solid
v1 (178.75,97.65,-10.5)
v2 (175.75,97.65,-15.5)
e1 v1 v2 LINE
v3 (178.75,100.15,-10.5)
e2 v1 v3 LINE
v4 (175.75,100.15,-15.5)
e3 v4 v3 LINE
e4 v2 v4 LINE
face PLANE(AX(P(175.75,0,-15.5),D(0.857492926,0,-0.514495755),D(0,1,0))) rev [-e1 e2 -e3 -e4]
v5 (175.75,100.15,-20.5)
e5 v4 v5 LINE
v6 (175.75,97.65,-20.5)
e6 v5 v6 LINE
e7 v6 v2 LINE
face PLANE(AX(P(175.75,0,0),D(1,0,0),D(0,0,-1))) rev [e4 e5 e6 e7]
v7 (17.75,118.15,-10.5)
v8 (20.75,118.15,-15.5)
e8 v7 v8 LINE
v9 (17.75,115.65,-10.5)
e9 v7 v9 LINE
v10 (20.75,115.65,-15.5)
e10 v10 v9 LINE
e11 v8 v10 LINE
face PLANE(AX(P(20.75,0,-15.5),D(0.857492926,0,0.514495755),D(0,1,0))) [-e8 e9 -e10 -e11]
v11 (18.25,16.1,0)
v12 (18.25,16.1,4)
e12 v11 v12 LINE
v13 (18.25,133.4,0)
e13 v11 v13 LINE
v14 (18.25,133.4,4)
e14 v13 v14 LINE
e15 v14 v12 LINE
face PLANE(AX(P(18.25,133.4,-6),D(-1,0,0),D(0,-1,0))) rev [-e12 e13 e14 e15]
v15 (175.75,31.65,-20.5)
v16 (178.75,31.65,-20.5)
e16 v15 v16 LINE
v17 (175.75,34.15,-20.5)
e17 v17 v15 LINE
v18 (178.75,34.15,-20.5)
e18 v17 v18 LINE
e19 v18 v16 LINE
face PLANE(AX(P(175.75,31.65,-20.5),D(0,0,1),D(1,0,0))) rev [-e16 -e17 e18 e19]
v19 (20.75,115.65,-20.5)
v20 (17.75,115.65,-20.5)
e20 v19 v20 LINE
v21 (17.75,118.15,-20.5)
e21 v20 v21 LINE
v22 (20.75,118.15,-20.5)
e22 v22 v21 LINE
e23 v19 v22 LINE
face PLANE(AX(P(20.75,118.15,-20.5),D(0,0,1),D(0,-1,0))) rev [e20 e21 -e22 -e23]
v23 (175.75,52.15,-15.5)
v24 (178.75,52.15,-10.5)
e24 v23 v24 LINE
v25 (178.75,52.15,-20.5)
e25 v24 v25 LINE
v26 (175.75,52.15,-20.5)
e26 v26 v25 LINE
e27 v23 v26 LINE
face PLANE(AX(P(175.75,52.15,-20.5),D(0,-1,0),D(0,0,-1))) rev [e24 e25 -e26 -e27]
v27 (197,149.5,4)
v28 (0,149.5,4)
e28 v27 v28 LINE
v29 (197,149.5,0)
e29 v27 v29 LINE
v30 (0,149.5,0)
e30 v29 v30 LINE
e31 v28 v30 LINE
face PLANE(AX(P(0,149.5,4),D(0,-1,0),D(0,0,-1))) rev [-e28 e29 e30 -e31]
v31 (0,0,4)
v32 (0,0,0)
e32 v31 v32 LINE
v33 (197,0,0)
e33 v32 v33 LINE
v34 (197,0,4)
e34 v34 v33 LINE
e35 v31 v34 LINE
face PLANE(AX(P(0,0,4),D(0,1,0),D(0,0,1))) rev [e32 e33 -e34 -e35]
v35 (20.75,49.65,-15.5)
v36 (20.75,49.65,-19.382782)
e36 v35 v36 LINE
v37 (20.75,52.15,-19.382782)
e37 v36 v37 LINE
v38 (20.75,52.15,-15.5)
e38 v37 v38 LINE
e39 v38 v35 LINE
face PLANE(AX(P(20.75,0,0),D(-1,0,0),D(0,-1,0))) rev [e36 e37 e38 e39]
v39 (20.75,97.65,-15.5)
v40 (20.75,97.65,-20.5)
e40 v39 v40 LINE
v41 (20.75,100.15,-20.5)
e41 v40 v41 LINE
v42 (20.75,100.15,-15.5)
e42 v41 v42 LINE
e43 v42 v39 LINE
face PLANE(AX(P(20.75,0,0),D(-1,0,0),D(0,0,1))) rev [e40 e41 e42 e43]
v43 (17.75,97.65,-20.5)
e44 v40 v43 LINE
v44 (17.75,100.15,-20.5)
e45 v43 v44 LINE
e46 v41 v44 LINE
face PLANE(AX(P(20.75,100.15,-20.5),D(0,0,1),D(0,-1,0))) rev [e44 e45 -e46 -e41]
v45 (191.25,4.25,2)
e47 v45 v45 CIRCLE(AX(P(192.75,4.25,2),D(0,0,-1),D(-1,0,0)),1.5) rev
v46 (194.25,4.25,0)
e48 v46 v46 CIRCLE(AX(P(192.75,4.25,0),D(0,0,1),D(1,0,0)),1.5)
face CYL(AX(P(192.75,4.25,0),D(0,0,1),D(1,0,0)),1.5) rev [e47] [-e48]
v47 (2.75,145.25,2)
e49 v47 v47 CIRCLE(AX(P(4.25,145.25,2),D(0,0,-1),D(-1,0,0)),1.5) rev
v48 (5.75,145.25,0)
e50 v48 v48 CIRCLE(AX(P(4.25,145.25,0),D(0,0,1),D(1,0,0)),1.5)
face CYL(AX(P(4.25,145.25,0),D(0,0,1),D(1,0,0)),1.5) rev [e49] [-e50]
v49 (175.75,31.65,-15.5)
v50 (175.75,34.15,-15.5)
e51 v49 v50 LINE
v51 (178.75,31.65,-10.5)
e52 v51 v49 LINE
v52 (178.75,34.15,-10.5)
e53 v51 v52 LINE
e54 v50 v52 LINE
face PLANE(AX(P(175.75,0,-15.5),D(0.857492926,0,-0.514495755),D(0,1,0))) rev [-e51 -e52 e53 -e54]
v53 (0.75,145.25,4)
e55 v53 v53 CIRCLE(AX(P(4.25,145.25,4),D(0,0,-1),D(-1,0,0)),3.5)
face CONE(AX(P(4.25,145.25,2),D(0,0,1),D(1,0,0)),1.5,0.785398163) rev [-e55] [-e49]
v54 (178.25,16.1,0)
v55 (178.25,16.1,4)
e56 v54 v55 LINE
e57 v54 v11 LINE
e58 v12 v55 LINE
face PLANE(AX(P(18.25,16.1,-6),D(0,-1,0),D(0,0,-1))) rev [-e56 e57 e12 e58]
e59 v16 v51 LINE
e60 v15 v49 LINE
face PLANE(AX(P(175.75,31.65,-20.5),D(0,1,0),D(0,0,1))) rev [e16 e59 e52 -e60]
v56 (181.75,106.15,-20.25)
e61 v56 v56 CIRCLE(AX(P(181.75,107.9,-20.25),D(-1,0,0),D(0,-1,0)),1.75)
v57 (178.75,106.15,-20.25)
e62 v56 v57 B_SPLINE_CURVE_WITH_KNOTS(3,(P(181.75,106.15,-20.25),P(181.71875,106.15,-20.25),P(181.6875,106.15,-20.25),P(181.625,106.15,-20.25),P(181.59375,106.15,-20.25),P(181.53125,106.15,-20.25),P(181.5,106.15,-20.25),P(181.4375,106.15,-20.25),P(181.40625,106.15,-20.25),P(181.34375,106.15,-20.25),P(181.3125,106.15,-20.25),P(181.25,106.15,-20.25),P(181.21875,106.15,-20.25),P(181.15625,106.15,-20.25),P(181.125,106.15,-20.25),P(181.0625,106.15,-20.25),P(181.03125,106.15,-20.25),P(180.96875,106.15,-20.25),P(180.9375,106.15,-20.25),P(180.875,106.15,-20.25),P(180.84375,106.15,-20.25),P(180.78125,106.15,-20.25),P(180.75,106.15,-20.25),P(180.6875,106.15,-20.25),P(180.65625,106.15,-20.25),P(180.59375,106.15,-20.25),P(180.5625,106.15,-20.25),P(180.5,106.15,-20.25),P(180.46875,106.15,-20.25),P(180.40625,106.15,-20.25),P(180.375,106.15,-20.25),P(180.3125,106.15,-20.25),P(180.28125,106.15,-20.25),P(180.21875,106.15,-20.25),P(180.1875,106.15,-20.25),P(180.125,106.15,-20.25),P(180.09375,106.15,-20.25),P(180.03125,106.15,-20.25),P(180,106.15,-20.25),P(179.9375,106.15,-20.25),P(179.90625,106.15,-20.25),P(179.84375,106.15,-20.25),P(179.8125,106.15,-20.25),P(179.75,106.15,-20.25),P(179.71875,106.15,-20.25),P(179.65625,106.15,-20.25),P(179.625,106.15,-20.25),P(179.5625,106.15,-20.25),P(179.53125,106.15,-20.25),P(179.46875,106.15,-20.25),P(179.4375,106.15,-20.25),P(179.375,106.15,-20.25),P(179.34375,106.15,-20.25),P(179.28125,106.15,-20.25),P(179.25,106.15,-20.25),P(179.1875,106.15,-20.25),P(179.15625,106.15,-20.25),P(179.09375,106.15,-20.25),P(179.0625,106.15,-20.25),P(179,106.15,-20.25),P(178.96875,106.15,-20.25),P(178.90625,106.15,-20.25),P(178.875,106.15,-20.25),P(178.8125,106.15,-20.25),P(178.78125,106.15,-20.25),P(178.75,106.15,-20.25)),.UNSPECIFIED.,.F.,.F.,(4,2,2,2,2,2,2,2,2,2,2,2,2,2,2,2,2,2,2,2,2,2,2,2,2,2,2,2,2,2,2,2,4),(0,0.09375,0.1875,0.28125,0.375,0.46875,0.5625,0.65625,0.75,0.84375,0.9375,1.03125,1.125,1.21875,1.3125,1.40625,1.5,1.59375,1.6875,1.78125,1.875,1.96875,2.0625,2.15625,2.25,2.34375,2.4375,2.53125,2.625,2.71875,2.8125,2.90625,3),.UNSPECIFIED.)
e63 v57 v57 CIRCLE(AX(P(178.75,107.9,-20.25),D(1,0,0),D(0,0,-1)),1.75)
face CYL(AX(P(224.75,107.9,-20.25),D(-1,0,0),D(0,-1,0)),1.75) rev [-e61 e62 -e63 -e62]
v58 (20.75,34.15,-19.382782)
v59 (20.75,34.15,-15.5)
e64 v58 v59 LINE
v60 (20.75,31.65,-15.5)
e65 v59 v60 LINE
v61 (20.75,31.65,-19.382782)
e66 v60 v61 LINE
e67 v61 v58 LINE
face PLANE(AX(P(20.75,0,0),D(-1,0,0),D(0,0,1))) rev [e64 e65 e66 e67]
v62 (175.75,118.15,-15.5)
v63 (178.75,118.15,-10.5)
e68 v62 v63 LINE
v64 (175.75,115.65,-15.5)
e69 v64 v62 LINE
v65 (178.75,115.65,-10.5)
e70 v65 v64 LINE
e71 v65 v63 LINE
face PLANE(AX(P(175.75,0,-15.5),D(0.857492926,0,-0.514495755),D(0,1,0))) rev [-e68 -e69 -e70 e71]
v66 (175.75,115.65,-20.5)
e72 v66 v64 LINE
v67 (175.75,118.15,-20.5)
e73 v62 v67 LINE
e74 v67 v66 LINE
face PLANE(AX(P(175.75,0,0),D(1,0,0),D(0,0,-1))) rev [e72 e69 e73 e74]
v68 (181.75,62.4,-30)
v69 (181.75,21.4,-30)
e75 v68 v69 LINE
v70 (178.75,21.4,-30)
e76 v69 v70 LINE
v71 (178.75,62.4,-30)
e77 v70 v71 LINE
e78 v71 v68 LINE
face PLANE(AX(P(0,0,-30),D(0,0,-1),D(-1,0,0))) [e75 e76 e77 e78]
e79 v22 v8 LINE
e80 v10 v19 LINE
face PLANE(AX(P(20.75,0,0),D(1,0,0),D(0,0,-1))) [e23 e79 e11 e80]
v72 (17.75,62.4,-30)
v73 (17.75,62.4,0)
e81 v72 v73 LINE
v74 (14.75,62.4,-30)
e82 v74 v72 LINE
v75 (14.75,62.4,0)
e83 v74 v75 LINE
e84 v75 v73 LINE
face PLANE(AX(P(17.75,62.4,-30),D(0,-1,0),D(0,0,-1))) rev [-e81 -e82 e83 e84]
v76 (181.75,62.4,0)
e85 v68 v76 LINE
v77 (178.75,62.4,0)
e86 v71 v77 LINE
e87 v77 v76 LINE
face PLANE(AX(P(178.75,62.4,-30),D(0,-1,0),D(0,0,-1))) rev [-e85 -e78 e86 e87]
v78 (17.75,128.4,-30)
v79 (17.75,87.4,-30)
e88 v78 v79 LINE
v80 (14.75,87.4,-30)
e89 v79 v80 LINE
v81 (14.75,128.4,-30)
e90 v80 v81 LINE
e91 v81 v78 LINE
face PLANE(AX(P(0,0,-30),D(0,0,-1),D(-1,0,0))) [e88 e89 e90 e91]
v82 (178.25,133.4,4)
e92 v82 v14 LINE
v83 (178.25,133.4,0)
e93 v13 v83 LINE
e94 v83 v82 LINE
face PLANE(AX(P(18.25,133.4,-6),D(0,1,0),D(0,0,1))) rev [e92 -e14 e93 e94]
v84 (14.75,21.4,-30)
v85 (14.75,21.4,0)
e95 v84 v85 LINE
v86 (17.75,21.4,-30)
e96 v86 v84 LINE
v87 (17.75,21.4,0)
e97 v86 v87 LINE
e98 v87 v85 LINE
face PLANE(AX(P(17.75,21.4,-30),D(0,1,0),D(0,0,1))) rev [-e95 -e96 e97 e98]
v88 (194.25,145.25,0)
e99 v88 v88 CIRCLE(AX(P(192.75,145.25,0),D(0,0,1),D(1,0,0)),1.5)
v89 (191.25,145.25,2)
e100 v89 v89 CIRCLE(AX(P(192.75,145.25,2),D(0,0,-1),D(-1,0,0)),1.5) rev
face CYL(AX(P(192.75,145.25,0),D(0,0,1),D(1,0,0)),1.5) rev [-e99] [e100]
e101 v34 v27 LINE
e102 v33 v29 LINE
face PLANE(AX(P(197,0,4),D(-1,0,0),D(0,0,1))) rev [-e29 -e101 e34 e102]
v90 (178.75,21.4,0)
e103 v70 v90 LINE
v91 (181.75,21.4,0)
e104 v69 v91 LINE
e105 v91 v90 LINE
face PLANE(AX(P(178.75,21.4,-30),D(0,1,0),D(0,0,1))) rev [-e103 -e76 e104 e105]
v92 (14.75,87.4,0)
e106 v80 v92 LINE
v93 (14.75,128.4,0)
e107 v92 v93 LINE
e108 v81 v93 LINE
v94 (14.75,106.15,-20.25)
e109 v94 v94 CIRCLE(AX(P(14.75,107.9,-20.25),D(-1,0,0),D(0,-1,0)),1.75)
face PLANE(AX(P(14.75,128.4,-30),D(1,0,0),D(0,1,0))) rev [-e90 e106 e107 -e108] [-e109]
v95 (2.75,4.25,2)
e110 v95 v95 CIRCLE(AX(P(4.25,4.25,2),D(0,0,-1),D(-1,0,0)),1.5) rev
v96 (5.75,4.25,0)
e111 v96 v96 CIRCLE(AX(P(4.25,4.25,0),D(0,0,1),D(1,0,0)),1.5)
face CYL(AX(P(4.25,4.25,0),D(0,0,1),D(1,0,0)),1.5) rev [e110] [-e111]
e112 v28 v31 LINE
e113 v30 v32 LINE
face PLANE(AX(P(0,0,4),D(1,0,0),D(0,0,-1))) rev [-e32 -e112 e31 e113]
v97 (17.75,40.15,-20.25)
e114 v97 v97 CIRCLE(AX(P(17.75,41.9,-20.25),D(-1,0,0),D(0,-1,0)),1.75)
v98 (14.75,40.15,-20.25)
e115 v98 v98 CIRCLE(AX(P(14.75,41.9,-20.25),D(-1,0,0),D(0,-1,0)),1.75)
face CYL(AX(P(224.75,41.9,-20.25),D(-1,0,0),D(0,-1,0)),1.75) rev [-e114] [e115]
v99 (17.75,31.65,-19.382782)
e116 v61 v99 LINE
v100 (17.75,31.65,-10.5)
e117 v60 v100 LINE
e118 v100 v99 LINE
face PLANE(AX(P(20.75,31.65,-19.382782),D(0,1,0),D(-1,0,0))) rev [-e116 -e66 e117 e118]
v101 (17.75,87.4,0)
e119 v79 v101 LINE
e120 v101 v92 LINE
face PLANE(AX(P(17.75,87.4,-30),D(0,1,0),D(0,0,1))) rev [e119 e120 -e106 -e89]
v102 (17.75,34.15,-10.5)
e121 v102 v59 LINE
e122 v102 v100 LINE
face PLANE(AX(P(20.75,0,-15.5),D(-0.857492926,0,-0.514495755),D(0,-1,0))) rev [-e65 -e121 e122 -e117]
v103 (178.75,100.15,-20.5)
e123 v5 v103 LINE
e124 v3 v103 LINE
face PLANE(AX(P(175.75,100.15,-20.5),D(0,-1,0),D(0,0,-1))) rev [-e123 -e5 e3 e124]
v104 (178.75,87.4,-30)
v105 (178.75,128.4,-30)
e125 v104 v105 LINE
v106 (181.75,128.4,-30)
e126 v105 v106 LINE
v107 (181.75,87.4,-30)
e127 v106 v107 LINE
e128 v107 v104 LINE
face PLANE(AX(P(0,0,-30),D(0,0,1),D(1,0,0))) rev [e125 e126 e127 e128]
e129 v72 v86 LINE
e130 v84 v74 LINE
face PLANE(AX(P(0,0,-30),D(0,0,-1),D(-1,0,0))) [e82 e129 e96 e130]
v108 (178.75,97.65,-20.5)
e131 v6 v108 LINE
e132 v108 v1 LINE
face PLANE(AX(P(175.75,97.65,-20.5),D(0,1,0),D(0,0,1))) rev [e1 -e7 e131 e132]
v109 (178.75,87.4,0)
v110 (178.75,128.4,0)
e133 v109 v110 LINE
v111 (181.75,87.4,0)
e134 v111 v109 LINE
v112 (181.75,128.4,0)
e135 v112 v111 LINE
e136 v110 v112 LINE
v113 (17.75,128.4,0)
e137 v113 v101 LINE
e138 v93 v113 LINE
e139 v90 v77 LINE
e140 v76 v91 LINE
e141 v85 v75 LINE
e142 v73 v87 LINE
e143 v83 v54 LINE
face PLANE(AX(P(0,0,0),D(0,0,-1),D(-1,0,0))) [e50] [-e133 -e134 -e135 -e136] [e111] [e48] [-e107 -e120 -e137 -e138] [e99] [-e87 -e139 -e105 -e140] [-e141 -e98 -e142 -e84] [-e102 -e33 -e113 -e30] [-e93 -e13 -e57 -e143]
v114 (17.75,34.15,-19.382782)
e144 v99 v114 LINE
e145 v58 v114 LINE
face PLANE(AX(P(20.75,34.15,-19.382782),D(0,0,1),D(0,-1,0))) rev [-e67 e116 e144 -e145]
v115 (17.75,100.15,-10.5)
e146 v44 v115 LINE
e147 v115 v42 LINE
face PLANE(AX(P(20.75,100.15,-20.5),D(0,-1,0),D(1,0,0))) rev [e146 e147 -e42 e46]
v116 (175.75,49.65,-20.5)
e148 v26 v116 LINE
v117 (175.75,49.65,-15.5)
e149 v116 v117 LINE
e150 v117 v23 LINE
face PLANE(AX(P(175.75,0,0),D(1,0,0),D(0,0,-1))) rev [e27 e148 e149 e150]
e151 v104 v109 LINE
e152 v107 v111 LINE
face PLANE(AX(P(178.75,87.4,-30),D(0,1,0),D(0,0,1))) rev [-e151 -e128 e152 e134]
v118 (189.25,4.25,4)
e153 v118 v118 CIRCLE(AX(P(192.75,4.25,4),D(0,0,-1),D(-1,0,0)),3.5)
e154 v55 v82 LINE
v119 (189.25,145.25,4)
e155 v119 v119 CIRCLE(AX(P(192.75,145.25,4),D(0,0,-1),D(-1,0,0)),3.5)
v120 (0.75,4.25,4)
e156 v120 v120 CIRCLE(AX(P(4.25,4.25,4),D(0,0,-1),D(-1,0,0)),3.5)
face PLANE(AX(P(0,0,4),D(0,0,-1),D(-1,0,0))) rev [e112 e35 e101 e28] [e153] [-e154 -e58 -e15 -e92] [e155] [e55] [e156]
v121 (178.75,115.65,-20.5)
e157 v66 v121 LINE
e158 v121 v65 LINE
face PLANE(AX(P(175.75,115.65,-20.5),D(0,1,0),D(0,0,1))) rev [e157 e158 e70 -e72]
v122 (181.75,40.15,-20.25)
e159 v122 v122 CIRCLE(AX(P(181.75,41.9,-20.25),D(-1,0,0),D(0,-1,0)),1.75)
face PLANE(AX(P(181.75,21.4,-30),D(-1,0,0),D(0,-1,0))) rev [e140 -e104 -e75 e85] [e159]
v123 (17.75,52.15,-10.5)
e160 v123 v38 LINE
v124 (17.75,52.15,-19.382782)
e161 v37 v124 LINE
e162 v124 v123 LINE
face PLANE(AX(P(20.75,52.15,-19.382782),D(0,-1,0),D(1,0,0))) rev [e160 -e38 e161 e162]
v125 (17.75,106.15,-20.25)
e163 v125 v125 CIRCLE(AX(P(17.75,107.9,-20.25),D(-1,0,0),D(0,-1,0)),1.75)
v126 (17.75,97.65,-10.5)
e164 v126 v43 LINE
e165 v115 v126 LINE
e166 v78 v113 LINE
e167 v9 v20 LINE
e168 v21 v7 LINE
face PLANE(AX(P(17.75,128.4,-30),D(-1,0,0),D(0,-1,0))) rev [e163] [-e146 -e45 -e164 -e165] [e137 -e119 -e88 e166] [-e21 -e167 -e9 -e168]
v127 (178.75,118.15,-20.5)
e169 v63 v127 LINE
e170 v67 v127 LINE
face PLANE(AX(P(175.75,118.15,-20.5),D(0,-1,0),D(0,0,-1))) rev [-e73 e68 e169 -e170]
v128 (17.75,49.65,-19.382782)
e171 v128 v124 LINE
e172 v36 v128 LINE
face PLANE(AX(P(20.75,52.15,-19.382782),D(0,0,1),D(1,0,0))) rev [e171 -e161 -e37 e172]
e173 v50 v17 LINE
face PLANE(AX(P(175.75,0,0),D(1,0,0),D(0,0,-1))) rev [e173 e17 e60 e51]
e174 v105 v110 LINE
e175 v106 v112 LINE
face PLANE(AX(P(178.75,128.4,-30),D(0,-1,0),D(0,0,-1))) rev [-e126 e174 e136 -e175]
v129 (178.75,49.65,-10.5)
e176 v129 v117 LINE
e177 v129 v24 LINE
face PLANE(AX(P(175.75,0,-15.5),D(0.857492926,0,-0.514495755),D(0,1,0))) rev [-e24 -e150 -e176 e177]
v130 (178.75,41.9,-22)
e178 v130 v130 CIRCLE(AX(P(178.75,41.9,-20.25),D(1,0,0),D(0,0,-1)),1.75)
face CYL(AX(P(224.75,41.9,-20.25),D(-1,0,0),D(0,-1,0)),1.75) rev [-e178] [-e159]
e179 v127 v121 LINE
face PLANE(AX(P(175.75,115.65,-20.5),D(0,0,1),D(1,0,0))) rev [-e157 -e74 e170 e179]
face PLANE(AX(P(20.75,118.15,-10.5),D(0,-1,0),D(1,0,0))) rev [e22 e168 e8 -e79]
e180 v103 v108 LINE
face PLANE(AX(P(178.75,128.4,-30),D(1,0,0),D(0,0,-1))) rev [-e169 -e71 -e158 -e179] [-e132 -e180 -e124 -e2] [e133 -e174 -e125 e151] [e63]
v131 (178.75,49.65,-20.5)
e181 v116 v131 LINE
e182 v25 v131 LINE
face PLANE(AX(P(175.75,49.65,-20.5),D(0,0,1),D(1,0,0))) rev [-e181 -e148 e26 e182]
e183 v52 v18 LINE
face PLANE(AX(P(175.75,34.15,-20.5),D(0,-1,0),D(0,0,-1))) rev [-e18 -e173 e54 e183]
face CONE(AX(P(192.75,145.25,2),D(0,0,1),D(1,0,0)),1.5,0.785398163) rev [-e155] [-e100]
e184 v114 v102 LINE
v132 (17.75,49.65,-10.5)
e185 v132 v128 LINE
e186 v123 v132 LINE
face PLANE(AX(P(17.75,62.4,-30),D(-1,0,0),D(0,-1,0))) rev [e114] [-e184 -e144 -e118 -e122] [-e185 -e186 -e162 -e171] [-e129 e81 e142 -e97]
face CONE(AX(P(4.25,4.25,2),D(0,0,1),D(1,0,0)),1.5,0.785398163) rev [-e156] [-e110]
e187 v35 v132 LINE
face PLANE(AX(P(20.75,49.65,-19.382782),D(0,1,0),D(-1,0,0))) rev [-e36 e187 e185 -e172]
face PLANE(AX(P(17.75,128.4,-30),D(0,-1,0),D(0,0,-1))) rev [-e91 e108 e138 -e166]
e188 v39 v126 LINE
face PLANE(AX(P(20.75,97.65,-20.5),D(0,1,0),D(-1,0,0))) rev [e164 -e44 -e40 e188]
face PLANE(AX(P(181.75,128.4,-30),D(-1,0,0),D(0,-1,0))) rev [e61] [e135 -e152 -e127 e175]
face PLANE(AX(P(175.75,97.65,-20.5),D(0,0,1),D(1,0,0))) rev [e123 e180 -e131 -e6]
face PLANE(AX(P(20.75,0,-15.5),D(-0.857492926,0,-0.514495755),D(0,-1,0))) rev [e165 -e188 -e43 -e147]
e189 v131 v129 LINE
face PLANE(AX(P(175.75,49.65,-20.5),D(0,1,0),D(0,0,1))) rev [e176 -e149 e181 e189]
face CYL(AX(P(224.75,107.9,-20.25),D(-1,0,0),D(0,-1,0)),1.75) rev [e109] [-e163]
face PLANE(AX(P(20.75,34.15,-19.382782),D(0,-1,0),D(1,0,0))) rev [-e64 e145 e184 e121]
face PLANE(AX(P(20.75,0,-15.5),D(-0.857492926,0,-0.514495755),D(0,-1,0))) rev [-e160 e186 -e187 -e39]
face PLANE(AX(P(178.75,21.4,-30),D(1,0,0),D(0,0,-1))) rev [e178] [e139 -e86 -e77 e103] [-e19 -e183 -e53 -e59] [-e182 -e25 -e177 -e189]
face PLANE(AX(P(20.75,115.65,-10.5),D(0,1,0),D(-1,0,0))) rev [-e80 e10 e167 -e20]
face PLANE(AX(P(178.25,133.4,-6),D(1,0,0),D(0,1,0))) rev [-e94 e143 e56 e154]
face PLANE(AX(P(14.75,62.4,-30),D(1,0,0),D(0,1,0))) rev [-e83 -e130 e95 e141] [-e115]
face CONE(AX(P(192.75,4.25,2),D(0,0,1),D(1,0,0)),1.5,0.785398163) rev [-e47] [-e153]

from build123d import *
from OCP.BRepFilletAPI import BRepFilletAPI_MakeChamfer

# Parameters (mm, degrees)
ESQUISSE1_W             = 197
ESQUISSE1_H             = 149.5
BOSS_EXTRU_1_DEPTH      = 4
ESQUISSE3_R             = 1.5
ENL_V_MAT_EXTRU_2_DEPTH = 4
CHANFREIN1_SIZE         = 2
ESQUISSE4_W             = 160
ESQUISSE4_H             = 117.3
ENL_V_MAT_EXTRU_3_DEPTH = 10
ESQUISSE5_W             = 3
ESQUISSE5_H             = 41
BOSS_EXTRU_2_DEPTH      = 30
ESQUISSE6_W             = 10
ESQUISSE6_H             = 2.5
ESQUISSE6_W_2           = 8.882781921
BOSS_EXTRU_3_DEPTH      = 3
ESQUISSE7_W             = 10
ESQUISSE7_H             = 2.5
BOSS_EXTRU_4_DEPTH      = 3
CHANFREIN2_SIZE         = 3
CHANFREIN2_SIZE_2       = 5
ESQUISSE8_R             = 1.75
ENL_V_MAT_EXTRU_4_DEPTH = 210


with BuildPart() as part:
    # Esquisse1 → Boss.-Extru.1 (new body)
    with BuildSketch(Plane.XY):
        with Locations((98.5, 74.75)):
            Rectangle(ESQUISSE1_W, ESQUISSE1_H)
    extrude(amount=BOSS_EXTRU_1_DEPTH)

    # Esquisse3 → Enlèv. mat.-Extru.2 (cut)
    with BuildSketch(Plane.XY.offset(4)):
        with Locations((4.25, 145.25)):
            Circle(ESQUISSE3_R)
        with Locations((4.25, 4.25)):
            Circle(ESQUISSE3_R)
        with Locations((192.75, 4.25)):
            Circle(ESQUISSE3_R)
        with Locations((192.75, 145.25)):
            Circle(ESQUISSE3_R)
    extrude(amount=-ENL_V_MAT_EXTRU_2_DEPTH, mode=Mode.SUBTRACT)

    # Chanfrein1
    chanfrein1_edges = [part.edges().sort_by_distance(p)[0] for p in [
        (2.75, 145.25, 4),
        (2.75, 4.25, 4),
        (191.25, 4.25, 4),
        (191.25, 145.25, 4),
    ]]
    chamfer(chanfrein1_edges, length=CHANFREIN1_SIZE)

    # Esquisse4 → Enlèv. mat.-Extru.3 (cut)
    with BuildSketch(Plane.XY.offset(4)):
        with Locations((98.25, 74.75)):
            Rectangle(ESQUISSE4_W, ESQUISSE4_H)
    extrude(amount=-ENL_V_MAT_EXTRU_3_DEPTH, mode=Mode.SUBTRACT)

    # Esquisse5 → Boss.-Extru.2 (add)
    with BuildSketch(Plane(origin=(0, 0, 0), x_dir=(-1, 0, 0), z_dir=(0, 0, -1))):
        with Locations((-180.25, 107.9)):
            Rectangle(ESQUISSE5_W, ESQUISSE5_H)
        with Locations((-180.25, 41.9)):
            Rectangle(ESQUISSE5_W, ESQUISSE5_H)
        with Locations((-16.25, 107.9)):
            Rectangle(ESQUISSE5_W, ESQUISSE5_H)
        with Locations((-16.25, 41.9)):
            Rectangle(ESQUISSE5_W, ESQUISSE5_H)
    extrude(amount=BOSS_EXTRU_2_DEPTH)

    # Esquisse6 → Boss.-Extru.3 (add)
    with BuildSketch(Plane(origin=(17.75, 0, 0), x_dir=(0, 0, -1), z_dir=(1, 0, 0))):
        with Locations((15.5, 116.9)):
            Rectangle(ESQUISSE6_W, ESQUISSE6_H)
        with Locations((15.5, 98.9)):
            Rectangle(ESQUISSE6_W, ESQUISSE6_H)
        with Locations((14.941390961, 50.9)):
            Rectangle(ESQUISSE6_W_2, ESQUISSE6_H)
        with Locations((14.941390961, 32.9)):
            Rectangle(ESQUISSE6_W_2, ESQUISSE6_H)
    extrude(amount=BOSS_EXTRU_3_DEPTH)

    # Esquisse7 → Boss.-Extru.4 (add)
    with BuildSketch(Plane.ZY.offset(-178.75)):
        with Locations((-15.5, 32.9)):
            Rectangle(ESQUISSE7_W, ESQUISSE7_H)
        with Locations((-15.5, 50.9)):
            Rectangle(ESQUISSE7_W, ESQUISSE7_H)
        with Locations((-15.5, 98.9)):
            Rectangle(ESQUISSE7_W, ESQUISSE7_H)
        with Locations((-15.5, 116.9)):
            Rectangle(ESQUISSE7_W, ESQUISSE7_H)
    extrude(amount=BOSS_EXTRU_4_DEPTH)

    # Chanfrein2
    chanfrein2_edges_1 = [part.edges().sort_by_distance(p)[0] for p in [
        (20.75, 98.9, -10.5),
    ]]
    chanfrein2_side_1 = [part.faces().sort_by_distance(p)[0] for p in [
        (20.69, 98.9, -10.5),
    ]]
    chanfrein2_edges_2 = [part.edges().sort_by_distance(p)[0] for p in [
        (20.75, 116.9, -10.5),
    ]]
    chanfrein2_side_2 = [part.faces().sort_by_distance(p)[0] for p in [
        (20.69, 116.9, -10.5),
    ]]
    chanfrein2_edges_3 = [part.edges().sort_by_distance(p)[0] for p in [
        (20.75, 32.9, -10.5),
    ]]
    chanfrein2_side_3 = [part.faces().sort_by_distance(p)[0] for p in [
        (20.69, 32.9, -10.5),
    ]]
    chanfrein2_edges_4 = [part.edges().sort_by_distance(p)[0] for p in [
        (20.75, 50.9, -10.5),
    ]]
    chanfrein2_side_4 = [part.faces().sort_by_distance(p)[0] for p in [
        (20.69, 50.9, -10.5),
    ]]
    chanfrein2_edges_5 = [part.edges().sort_by_distance(p)[0] for p in [
        (175.75, 116.9, -10.5),
    ]]
    chanfrein2_side_5 = [part.faces().sort_by_distance(p)[0] for p in [
        (175.81, 116.9, -10.5),
    ]]
    chanfrein2_edges_6 = [part.edges().sort_by_distance(p)[0] for p in [
        (175.75, 98.9, -10.5),
    ]]
    chanfrein2_side_6 = [part.faces().sort_by_distance(p)[0] for p in [
        (175.81, 98.9, -10.5),
    ]]
    chanfrein2_edges_7 = [part.edges().sort_by_distance(p)[0] for p in [
        (175.75, 50.9, -10.5),
    ]]
    chanfrein2_side_7 = [part.faces().sort_by_distance(p)[0] for p in [
        (175.81, 50.9, -10.5),
    ]]
    chanfrein2_edges_8 = [part.edges().sort_by_distance(p)[0] for p in [
        (175.75, 32.9, -10.5),
    ]]
    chanfrein2_side_8 = [part.faces().sort_by_distance(p)[0] for p in [
        (175.81, 32.9, -10.5),
    ]]
    chanfrein2 = BRepFilletAPI_MakeChamfer(part.part.solid().wrapped)
    for e in chanfrein2_edges_1:
        chanfrein2.Add(CHANFREIN2_SIZE - 0.0001, CHANFREIN2_SIZE_2 - 0.0001, e.wrapped, chanfrein2_side_1[0].wrapped)
    for e in chanfrein2_edges_2:
        chanfrein2.Add(CHANFREIN2_SIZE - 0.0001, CHANFREIN2_SIZE_2 - 0.0001, e.wrapped, chanfrein2_side_2[0].wrapped)
    for e in chanfrein2_edges_3:
        chanfrein2.Add(CHANFREIN2_SIZE - 0.0001, CHANFREIN2_SIZE_2 - 0.0001, e.wrapped, chanfrein2_side_3[0].wrapped)
    for e in chanfrein2_edges_4:
        chanfrein2.Add(CHANFREIN2_SIZE - 0.0001, CHANFREIN2_SIZE_2 - 0.0001, e.wrapped, chanfrein2_side_4[0].wrapped)
    for e in chanfrein2_edges_5:
        chanfrein2.Add(CHANFREIN2_SIZE - 0.0001, CHANFREIN2_SIZE_2 - 0.0001, e.wrapped, chanfrein2_side_5[0].wrapped)
    for e in chanfrein2_edges_6:
        chanfrein2.Add(CHANFREIN2_SIZE - 0.0001, CHANFREIN2_SIZE_2 - 0.0001, e.wrapped, chanfrein2_side_6[0].wrapped)
    for e in chanfrein2_edges_7:
        chanfrein2.Add(CHANFREIN2_SIZE - 0.0001, CHANFREIN2_SIZE_2 - 0.0001, e.wrapped, chanfrein2_side_7[0].wrapped)
    for e in chanfrein2_edges_8:
        chanfrein2.Add(CHANFREIN2_SIZE - 0.0001, CHANFREIN2_SIZE_2 - 0.0001, e.wrapped, chanfrein2_side_8[0].wrapped)
    add(Compound.cast(chanfrein2.Shape()), mode=Mode.REPLACE)  # a hair under: the kernel refuses the full size

    # Esquisse8 → Enlèv. mat.-Extru.4 (cut)
    with BuildSketch(Plane.ZY.offset(-14.75)):
        with Locations(Location((-20.25, 107.9, 0), (0, 0, 270))):
            Circle(ESQUISSE8_R)
        with Locations(Location((-20.25, 41.9, 0), (0, 0, 270))):
            Circle(ESQUISSE8_R)
    extrude(amount=-ENL_V_MAT_EXTRU_4_DEPTH, mode=Mode.SUBTRACT)


solid = part.part
